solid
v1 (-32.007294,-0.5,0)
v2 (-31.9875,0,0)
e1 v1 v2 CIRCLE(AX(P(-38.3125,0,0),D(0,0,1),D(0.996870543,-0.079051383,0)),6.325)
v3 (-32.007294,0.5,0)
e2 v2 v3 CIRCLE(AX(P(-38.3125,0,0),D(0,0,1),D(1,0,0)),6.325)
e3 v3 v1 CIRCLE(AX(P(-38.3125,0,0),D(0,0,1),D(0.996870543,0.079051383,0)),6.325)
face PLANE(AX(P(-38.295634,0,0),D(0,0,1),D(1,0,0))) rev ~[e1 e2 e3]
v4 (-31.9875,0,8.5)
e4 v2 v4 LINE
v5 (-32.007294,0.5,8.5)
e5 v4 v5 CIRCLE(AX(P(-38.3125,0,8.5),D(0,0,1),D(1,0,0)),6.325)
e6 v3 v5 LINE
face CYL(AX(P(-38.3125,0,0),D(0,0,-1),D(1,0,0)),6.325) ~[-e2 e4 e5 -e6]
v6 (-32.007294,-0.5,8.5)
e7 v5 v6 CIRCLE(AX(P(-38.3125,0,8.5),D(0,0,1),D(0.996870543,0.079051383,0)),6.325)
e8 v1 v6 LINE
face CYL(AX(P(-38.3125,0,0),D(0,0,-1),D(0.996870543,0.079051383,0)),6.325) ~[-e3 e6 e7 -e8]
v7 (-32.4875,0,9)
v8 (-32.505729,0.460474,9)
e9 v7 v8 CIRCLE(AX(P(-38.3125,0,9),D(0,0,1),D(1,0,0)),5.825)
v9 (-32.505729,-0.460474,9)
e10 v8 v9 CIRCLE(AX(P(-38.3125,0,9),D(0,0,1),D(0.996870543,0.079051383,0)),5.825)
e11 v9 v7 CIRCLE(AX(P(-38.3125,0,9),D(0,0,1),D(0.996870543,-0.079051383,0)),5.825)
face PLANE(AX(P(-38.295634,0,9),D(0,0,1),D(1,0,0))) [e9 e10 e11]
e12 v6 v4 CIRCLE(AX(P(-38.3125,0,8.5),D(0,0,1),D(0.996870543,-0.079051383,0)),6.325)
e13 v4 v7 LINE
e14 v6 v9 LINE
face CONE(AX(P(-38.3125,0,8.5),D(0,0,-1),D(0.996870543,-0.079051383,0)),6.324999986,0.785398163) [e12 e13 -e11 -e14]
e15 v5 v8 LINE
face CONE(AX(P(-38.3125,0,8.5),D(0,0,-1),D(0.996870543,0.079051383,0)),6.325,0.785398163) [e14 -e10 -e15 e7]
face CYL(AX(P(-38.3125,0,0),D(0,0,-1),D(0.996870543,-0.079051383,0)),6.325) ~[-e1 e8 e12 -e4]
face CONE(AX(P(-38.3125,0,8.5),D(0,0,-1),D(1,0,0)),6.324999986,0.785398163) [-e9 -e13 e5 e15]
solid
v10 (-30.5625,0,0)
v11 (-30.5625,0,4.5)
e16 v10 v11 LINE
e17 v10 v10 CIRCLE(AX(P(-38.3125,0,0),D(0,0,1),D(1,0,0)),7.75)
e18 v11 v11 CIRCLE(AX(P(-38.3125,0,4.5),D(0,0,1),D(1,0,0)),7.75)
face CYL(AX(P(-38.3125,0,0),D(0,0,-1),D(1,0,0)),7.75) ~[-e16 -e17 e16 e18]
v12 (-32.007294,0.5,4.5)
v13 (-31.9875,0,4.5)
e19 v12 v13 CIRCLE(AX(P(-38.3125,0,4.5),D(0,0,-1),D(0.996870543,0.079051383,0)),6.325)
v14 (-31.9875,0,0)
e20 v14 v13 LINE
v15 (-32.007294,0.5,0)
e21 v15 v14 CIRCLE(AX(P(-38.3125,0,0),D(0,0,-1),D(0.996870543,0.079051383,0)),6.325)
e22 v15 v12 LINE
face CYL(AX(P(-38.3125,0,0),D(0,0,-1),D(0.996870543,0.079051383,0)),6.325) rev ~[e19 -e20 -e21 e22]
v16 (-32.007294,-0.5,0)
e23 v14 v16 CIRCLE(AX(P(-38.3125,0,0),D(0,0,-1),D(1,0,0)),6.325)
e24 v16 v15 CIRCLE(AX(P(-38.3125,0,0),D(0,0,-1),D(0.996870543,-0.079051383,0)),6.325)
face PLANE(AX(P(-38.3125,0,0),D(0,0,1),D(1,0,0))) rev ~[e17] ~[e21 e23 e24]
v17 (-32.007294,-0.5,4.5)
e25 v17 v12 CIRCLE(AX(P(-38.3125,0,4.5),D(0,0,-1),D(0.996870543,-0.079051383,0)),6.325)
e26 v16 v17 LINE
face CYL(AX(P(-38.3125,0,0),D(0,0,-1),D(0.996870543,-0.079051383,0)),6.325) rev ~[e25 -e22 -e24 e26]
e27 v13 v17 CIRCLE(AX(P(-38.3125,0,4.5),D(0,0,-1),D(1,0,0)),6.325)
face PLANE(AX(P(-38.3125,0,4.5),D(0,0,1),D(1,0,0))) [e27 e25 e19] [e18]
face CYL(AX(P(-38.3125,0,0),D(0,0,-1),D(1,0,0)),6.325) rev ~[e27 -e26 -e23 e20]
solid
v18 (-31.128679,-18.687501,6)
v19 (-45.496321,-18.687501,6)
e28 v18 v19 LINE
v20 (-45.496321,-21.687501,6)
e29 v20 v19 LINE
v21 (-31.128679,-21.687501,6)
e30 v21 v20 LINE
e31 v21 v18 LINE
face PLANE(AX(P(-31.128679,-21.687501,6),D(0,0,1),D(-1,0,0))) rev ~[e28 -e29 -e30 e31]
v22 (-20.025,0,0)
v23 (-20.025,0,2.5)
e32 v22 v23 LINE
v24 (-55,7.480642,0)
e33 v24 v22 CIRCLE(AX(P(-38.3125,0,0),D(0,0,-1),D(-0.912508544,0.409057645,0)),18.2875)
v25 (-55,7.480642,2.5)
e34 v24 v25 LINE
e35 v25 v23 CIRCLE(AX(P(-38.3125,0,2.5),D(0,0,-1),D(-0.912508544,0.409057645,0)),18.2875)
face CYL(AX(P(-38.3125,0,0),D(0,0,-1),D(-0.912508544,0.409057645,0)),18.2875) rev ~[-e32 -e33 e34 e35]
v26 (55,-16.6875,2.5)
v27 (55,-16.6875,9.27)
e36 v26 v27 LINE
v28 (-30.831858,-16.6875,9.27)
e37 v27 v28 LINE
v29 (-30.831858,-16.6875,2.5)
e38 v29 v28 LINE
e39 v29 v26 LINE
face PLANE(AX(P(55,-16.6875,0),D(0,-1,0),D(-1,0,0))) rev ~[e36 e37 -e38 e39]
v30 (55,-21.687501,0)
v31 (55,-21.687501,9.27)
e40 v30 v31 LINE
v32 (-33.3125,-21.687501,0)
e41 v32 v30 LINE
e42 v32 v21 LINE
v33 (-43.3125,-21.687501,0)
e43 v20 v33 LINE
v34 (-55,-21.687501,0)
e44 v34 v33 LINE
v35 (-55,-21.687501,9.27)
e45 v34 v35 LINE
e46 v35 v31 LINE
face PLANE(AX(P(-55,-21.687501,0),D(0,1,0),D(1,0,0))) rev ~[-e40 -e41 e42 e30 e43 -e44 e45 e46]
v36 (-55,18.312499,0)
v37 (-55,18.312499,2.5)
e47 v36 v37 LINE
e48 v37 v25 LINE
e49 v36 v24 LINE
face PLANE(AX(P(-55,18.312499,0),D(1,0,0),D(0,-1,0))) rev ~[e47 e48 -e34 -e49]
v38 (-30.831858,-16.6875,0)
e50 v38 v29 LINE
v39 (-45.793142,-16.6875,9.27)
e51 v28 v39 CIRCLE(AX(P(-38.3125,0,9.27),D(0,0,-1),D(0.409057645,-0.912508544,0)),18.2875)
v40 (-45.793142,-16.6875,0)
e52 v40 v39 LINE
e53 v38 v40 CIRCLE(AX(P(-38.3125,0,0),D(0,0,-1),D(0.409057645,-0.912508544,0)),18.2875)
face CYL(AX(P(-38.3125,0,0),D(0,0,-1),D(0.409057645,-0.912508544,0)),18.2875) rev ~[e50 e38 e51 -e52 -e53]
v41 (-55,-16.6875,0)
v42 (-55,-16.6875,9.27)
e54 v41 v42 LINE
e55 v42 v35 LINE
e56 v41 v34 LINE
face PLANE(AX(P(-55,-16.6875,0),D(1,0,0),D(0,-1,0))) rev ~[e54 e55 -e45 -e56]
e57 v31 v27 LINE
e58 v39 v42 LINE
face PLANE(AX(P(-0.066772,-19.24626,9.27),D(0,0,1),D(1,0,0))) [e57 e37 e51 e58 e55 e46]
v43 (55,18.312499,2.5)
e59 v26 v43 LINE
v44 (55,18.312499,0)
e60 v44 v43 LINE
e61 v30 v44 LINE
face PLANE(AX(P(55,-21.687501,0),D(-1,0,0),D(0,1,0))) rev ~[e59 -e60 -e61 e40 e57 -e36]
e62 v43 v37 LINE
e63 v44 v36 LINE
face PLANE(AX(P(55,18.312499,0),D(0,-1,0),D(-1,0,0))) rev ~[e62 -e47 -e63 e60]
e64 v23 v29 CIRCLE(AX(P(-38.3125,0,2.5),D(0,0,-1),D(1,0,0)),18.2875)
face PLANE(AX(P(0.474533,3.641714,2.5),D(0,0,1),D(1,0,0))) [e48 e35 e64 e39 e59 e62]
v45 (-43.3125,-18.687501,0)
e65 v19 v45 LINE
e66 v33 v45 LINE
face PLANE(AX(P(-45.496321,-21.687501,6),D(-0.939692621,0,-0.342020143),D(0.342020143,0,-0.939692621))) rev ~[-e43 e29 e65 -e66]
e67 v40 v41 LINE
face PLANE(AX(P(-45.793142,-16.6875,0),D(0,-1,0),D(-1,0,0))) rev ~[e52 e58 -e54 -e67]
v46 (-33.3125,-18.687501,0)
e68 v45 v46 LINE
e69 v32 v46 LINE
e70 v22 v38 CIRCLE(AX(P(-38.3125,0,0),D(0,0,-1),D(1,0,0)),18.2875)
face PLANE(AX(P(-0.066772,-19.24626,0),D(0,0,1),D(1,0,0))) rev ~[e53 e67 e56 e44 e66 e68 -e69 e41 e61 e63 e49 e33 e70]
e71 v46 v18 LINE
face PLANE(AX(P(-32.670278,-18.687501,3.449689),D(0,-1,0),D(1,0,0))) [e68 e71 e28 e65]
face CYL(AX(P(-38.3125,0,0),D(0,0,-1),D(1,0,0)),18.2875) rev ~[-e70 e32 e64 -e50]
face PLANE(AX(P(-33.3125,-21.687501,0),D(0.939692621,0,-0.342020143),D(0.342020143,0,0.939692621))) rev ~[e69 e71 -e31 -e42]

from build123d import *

# Parameters (mm, degrees)
F1_DEPTH = 2.5
F0_R     = 7.75
F2_DEPTH = 4.5
F3_DEPTH = 9
F4_DEPTH = 9.27
F5_SIZE  = 0.5
F8_W     = 10
F8_H     = 6
F9_DEPTH = 3


# Not quite as in the source:
# - a feature of the source that left no trace in its solid (it failed there, or was rolled back) is left out


with BuildPart() as f1:
    # F0 (on Top) → F1 (new body)
    with BuildSketch(Plane.XY):
        with BuildLine():
            Line((55, 18.3124991804), (-55, 18.3124991804))
            Line((-55, 18.3124991804), (-55, 7.4806416837))
            ThreePointArc((-55, 7.4806416837), (-34.4875817002, 17.8830270438), (-20.025, 0))
            ThreePointArc((-20.025, 0), (-22.9626646419, -9.9405840236), (-30.8318583163, -16.6875))
            Line((-30.8318583163, -16.6875), (55, -16.6875))
            Line((55, -16.6875), (55, 18.3124991804))
        make_face()
    extrude(amount=F1_DEPTH)

    # F0 (on Top) → F4 (join)
    with BuildSketch(Plane.XY):
        with BuildLine():
            Line((55, -21.6875008196), (55, -16.6875))
            Line((55, -16.6875), (-30.8318583163, -16.6875))
            ThreePointArc((-30.8318583163, -16.6875), (-38.3125, -18.2875), (-45.7931416837, -16.6875))
            Line((-45.7931416837, -16.6875), (-55, -16.6875))
            Line((-55, -16.6875), (-55, -21.6875008196))
            Line((-55, -21.6875008196), (55, -21.6875008196))
        make_face()
    extrude(amount=F4_DEPTH)

    # F8 (on face) → F9 (cut)
    with BuildSketch(Plane.XZ.offset(21.6875008196)):
        Polygon((-33.3125, 6), (-33.3125, 0), (-31.1286785944, 6), align=None)
        with Locations((-38.3125, 3)):
            Rectangle(F8_W, F8_H)
        Polygon((-45.4963214056, 6), (-43.3125, 0), (-43.3125, 6), align=None)
    extrude(amount=-F9_DEPTH, mode=Mode.SUBTRACT)


with BuildPart() as f2:
    # F0 (on Top) → F2 (new body)
    with BuildSketch(Plane.XY):
        with Locations((-38.3125, 0)):
            Circle(F0_R)
        with BuildLine():
            ThreePointArc((-32.0072938178, 0.5), (-31.9924503917, 0.2501958209), (-31.9875, 0))
            ThreePointArc((-31.9875, 0), (-31.9924503917, -0.2501958209), (-32.0072938178, -0.5))
            ThreePointArc((-32.0072938178, -0.5), (-44.6375, 0), (-32.0072938178, 0.5))
        make_face(mode=Mode.SUBTRACT)
    extrude(amount=F2_DEPTH)


with BuildPart() as f3:
    # F0 (on Top) → F3 (new body)
    with BuildSketch(Plane.XY):
        with BuildLine():
            Line((-32.4964055004, 0.3219779063), (-32.0072938178, 0.5))
            ThreePointArc((-32.0072938178, 0.5), (-44.6375, 0), (-32.0072938178, -0.5))
            Line((-32.0072938178, -0.5), (-32.4964055004, -0.3219779063))
            ThreePointArc((-32.4964055004, -0.3219779063), (-44.1375, 0), (-32.4964055004, 0.3219779063))
        make_face()
        with BuildLine():
            ThreePointArc((-32.0072938178, -0.5), (-31.9924503917, -0.2501958209), (-31.9875, 0))
            ThreePointArc((-31.9875, 0), (-31.9924503917, 0.2501958209), (-32.0072938178, 0.5))
            Line((-32.0072938178, 0.5), (-32.4964055004, 0.3219779063))
            ThreePointArc((-32.4964055004, 0.3219779063), (-32.4897268007, 0.1610505201), (-32.4875, 0))
            ThreePointArc((-32.4875, 0), (-32.4897268007, -0.1610505201), (-32.4964055004, -0.3219779063))
            Line((-32.4964055004, -0.3219779063), (-32.0072938178, -0.5))
        make_face()
        with BuildLine():
            ThreePointArc((-32.4875, 0), (-32.4897268007, 0.1610505201), (-32.4964055004, 0.3219779063))
            ThreePointArc((-32.4964055004, 0.3219779063), (-44.1375, 0), (-32.4964055004, -0.3219779063))
            ThreePointArc((-32.4964055004, -0.3219779063), (-32.4897268007, -0.1610505201), (-32.4875, 0))
        make_face()
    extrude(amount=F3_DEPTH)

    # F5
    f5_edges = [f3.edges().sort_by_distance(p)[0] for p in [
        (-44.617706, 0.5, 9),
    ]]
    chamfer(f5_edges, length=F5_SIZE)


solid = Compound([f1.part, f2.part, f3.part])
